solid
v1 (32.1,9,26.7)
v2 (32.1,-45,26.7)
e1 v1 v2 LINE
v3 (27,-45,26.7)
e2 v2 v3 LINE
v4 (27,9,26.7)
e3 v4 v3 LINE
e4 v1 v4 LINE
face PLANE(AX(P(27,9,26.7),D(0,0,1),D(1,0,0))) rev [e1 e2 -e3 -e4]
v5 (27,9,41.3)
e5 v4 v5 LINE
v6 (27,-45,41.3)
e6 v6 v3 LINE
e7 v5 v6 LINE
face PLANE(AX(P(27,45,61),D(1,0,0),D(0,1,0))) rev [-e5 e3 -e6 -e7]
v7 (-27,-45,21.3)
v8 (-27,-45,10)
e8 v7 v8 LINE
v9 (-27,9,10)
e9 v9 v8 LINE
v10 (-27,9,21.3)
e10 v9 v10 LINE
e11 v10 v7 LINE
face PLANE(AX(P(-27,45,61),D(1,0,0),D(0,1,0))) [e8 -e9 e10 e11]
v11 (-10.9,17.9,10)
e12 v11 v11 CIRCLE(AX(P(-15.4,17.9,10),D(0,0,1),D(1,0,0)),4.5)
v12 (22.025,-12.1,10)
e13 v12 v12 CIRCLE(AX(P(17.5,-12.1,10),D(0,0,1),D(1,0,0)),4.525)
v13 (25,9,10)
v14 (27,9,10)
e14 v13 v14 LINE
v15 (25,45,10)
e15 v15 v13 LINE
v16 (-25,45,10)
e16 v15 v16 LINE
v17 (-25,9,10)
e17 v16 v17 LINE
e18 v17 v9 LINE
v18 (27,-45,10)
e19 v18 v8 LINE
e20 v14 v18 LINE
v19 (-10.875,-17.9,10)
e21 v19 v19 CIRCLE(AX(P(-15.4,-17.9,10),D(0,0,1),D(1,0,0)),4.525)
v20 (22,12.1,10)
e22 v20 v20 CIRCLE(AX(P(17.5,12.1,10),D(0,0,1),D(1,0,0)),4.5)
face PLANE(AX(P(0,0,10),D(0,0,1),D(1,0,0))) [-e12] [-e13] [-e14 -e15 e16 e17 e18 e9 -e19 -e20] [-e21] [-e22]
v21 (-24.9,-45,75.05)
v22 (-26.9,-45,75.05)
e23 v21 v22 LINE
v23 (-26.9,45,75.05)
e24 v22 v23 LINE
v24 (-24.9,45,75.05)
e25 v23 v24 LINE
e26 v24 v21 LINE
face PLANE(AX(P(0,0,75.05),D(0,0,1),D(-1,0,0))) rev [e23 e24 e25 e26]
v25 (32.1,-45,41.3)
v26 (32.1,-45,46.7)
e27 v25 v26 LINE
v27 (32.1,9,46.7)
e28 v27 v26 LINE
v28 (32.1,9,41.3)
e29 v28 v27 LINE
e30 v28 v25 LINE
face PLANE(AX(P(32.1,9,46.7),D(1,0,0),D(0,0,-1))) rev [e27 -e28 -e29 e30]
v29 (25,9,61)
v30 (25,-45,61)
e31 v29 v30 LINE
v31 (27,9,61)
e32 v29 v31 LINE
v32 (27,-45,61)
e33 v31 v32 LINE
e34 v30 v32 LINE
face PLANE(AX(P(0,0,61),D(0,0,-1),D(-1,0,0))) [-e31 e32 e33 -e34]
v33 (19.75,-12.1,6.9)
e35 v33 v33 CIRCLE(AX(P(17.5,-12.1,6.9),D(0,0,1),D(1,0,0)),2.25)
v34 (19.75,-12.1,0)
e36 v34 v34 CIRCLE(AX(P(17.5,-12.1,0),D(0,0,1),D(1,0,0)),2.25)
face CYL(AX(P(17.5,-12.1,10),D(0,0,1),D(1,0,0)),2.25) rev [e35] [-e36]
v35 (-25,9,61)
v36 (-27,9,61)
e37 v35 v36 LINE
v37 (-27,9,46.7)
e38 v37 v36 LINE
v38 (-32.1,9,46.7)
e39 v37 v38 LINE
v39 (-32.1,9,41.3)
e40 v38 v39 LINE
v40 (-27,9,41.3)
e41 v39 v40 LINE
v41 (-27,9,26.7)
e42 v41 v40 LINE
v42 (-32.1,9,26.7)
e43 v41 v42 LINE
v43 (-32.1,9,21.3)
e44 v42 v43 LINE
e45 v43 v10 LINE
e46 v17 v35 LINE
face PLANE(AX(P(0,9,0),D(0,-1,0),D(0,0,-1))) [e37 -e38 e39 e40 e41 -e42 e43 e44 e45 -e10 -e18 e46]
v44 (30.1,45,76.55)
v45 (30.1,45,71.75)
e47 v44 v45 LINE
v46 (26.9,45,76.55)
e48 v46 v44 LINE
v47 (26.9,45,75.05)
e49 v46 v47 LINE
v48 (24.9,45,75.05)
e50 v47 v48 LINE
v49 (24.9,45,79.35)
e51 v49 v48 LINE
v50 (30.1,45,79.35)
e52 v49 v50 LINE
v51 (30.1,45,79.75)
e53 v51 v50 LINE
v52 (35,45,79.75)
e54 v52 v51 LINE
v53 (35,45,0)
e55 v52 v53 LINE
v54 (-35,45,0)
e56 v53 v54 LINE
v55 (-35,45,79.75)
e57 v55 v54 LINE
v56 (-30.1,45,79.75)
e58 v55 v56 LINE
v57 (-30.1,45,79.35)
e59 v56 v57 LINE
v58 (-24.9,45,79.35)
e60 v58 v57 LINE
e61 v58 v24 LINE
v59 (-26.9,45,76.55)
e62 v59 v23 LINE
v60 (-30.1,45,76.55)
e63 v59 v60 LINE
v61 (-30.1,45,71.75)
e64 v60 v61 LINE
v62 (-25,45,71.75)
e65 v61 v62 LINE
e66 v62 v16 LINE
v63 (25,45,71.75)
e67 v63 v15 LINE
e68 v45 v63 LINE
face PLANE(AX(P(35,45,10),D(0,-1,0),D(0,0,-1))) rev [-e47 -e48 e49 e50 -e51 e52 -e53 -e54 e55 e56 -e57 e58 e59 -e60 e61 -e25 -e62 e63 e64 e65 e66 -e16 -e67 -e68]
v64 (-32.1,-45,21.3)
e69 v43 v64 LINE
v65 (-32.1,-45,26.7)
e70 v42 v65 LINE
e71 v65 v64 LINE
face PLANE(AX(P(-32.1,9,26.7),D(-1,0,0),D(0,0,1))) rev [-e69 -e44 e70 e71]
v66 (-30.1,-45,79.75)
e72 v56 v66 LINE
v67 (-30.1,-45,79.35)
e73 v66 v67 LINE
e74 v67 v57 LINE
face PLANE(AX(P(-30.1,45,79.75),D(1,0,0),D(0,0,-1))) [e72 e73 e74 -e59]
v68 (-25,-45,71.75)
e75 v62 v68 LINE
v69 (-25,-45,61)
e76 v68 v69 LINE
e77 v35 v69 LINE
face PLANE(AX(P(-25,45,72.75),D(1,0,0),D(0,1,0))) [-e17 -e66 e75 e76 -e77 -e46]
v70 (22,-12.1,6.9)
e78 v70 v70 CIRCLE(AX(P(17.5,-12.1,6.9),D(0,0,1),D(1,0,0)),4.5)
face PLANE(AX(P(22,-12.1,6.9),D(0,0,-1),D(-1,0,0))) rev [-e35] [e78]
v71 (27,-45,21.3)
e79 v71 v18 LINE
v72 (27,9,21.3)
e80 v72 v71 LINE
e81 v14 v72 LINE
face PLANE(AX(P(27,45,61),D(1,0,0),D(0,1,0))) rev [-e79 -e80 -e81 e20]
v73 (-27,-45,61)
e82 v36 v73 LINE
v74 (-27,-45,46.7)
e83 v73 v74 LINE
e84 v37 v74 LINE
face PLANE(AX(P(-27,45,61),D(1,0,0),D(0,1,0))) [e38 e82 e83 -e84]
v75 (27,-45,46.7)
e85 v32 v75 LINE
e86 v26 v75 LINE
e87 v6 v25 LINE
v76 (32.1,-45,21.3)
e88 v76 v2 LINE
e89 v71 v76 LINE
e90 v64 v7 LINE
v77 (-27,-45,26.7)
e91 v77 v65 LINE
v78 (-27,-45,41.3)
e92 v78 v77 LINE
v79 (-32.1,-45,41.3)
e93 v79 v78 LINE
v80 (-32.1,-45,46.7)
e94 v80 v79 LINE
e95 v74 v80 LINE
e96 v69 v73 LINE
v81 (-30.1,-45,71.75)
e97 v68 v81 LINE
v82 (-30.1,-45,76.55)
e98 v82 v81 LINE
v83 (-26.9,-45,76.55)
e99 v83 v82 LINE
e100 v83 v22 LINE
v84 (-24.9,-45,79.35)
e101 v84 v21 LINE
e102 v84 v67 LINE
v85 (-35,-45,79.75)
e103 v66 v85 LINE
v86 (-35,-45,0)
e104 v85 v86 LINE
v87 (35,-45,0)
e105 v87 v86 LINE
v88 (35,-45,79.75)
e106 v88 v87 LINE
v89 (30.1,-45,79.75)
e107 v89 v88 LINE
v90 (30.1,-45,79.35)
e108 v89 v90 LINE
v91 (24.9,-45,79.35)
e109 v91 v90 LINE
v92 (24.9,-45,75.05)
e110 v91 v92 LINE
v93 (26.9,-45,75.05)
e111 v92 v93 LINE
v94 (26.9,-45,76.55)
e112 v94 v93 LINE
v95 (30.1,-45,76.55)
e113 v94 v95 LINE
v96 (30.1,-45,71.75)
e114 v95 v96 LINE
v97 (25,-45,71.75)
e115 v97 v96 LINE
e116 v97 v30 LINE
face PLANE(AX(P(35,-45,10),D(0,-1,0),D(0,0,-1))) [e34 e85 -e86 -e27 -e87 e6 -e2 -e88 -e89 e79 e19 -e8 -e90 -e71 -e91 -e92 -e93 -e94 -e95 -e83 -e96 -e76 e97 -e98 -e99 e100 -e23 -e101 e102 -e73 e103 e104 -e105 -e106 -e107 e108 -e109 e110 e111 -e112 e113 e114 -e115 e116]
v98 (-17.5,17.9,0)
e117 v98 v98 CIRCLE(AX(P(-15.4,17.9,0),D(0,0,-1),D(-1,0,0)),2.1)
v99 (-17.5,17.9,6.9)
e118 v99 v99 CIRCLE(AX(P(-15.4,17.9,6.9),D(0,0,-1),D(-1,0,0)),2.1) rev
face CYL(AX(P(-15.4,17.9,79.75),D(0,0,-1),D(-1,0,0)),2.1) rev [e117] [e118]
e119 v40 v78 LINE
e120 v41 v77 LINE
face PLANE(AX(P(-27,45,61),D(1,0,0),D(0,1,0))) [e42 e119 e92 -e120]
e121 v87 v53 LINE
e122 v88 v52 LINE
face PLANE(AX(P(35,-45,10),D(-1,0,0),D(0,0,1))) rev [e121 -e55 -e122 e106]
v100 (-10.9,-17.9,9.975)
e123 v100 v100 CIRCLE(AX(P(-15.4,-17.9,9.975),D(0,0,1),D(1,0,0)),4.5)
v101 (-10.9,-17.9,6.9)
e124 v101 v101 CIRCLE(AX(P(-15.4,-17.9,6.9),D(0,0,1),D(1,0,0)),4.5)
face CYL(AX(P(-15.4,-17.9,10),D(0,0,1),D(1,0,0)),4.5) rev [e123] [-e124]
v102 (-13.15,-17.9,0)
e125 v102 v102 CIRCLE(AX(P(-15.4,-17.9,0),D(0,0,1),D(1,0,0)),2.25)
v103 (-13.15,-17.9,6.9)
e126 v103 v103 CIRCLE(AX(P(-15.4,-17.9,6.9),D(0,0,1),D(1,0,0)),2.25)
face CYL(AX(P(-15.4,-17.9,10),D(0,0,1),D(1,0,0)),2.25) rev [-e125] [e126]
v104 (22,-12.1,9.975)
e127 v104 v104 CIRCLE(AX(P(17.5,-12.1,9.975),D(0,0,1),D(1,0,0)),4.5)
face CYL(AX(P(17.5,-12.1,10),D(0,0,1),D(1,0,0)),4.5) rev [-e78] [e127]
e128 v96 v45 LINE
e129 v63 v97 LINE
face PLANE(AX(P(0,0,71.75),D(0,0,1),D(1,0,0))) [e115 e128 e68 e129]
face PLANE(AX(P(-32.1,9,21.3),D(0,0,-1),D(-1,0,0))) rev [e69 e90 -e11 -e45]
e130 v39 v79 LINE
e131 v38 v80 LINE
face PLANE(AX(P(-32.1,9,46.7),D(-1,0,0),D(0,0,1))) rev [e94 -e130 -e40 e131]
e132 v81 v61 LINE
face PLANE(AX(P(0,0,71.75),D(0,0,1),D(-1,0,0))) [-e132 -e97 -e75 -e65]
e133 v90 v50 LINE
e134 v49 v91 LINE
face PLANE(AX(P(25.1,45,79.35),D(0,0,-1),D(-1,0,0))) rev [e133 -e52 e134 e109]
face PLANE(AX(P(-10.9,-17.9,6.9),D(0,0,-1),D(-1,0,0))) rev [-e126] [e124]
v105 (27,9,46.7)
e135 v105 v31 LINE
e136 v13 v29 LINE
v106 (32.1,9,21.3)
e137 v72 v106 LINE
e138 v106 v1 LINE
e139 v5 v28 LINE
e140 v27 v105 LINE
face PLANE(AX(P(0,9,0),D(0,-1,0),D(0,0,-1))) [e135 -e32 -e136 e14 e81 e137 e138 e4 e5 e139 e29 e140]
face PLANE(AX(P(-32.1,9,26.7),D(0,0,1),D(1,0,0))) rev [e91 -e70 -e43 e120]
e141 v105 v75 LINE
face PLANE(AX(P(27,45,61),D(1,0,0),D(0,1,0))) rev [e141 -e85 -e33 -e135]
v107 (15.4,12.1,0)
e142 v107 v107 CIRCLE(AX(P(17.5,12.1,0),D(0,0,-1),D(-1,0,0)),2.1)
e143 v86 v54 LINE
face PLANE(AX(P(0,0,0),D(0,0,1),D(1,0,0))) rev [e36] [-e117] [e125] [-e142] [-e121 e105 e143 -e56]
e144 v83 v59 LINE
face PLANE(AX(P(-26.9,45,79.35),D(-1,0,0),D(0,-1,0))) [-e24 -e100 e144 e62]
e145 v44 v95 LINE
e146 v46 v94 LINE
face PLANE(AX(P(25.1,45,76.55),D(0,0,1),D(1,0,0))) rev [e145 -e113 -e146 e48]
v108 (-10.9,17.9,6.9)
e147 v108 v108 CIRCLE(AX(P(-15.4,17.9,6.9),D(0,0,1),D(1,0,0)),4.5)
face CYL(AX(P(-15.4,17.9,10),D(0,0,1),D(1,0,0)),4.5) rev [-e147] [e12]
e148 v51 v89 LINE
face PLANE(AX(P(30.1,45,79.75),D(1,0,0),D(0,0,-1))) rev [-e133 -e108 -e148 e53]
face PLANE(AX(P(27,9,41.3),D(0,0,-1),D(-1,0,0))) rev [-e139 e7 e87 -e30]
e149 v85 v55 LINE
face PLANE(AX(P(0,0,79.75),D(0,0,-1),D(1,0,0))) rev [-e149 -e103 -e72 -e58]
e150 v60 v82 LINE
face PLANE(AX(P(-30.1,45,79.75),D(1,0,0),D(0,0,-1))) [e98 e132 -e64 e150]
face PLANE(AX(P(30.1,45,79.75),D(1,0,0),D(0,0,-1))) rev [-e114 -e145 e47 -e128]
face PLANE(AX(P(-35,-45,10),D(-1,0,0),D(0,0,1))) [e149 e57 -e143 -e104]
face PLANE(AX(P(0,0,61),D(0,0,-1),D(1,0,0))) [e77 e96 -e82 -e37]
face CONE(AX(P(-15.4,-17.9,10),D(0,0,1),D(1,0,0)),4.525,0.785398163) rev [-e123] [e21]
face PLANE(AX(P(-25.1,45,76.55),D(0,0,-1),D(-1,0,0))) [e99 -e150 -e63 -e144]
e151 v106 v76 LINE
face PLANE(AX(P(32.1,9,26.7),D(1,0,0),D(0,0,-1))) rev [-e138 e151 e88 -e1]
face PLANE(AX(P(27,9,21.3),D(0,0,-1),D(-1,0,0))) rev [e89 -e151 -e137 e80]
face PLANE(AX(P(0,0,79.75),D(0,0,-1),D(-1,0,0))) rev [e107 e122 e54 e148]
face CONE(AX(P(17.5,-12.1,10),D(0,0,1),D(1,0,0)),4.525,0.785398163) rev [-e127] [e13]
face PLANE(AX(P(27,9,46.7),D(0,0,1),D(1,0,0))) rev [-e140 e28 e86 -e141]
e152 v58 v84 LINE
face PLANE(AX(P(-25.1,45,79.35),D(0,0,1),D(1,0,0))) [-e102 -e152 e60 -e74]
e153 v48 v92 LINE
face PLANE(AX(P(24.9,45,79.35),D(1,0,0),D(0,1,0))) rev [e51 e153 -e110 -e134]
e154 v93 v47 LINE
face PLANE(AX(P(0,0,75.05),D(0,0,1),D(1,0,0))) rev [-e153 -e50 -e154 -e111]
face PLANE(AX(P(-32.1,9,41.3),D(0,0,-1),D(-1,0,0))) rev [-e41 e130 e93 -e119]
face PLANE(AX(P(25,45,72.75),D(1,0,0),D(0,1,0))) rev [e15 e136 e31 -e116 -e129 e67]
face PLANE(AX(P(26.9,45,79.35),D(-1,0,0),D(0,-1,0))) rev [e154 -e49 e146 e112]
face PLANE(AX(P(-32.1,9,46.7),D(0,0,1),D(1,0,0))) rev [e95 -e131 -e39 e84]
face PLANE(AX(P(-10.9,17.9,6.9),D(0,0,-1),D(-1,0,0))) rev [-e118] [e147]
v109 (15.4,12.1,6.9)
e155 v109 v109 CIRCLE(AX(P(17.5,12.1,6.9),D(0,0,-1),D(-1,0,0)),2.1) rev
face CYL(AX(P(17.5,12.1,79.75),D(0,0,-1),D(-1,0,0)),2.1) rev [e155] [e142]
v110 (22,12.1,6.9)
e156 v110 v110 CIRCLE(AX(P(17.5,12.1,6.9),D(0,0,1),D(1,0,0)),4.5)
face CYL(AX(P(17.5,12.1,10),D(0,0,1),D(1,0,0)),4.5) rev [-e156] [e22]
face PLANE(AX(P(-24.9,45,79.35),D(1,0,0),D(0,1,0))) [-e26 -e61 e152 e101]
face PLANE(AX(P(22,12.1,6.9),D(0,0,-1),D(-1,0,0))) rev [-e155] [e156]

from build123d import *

# Parameters (mm, degrees)
SKETCH1_W                                     = 90
SKETCH1_H                                     = 70
BOSS_EXTRUDE1_DEPTH                           = 10
SKETCH2_W                                     = 8
SKETCH2_H                                     = 90
BOSS_EXTRUDE2_DEPTH                           = 51
SKETCH3_W                                     = 5.1
SKETCH3_H                                     = 5.4
CUT_EXTRUDE1_DEPTH                            = 54
SKETCH14_W                                    = 10
SKETCH14_H                                    = 90
BOSS_EXTRUDE6_DEPTH                           = 11.75
SKETCH15_W                                    = 4.9
SKETCH15_H                                    = 90
BOSS_EXTRUDE7_DEPTH                           = 7
SKETCH17_W                                    = 90
SKETCH17_H                                    = 2.8
BOSS_EXTRUDE8_DEPTH                           = 5
SKETCH16_W                                    = 5.1
SKETCH16_H                                    = 90
CUT_EXTRUDE3_DEPTH                            = 1
BOSS_EXTRUDE9_START                           = -1.5
SKETCH18_W                                    = 2
SKETCH18_H                                    = 90
BOSS_EXTRUDE9_DEPTH                           = 4.3
SKETCH43_W                                    = 36
SKETCH43_H                                    = 51
BOSS_EXTRUDE10_DEPTH                          = 2
SKETCH21_R                                    = 2.1
CUT_EXTRUDE7_DEPTH                            = 99.030926243
CBORE_FOR_M4_PAN_HEAD_MACHINE_SCREW4_AT_COUNT = 2
CBORE_FOR_M4_PAN_HEAD_MACHINE_SCREW4_AT_PITCH = 33.407334524
ADVANCEDHOLE1_START                           = 6.9
ADVANCEDHOLE1_OUTLINE_R                       = 4.5
ADVANCEDHOLE1_OUTLINE_R_2                     = 2.1
ADVANCEDHOLE1_DEPTH                           = 3.1


# Read off the part's stored shape, not the designer's step: AdvancedHole1
with BuildPart() as part:
    # Sketch1 → Boss-Extrude1 (new body)
    with BuildSketch(Plane(origin=(0, 0, 0), x_dir=(0, 1, 0), z_dir=(0, 0, 1))):
        Rectangle(SKETCH1_W, SKETCH1_H)
    extrude(amount=BOSS_EXTRUDE1_DEPTH)

    # Sketch2 → Boss-Extrude2 (add)
    with BuildSketch(Plane.XY.offset(10)):
        with Locations((-31, 0)):
            Rectangle(SKETCH2_W, SKETCH2_H)
        with Locations((31, 0)):
            Rectangle(SKETCH2_W, SKETCH2_H)
    extrude(amount=BOSS_EXTRUDE2_DEPTH)

    # Sketch3 → Cut-Extrude1 (cut)
    with BuildSketch(Plane.XZ.offset(45)):
        with Locations((-29.55, 24)):
            Rectangle(SKETCH3_W, SKETCH3_H)
        with Locations((-29.55, 44)):
            Rectangle(SKETCH3_W, SKETCH3_H)
        with Locations((29.55, 24)):
            Rectangle(SKETCH3_W, SKETCH3_H)
        with Locations((29.55, 44)):
            Rectangle(SKETCH3_W, SKETCH3_H)
    extrude(amount=-CUT_EXTRUDE1_DEPTH, mode=Mode.SUBTRACT)

    # Sketch14 → Boss-Extrude6 (add)
    with BuildSketch(Plane.XY.offset(61)):
        with Locations((30, 0)):
            Rectangle(SKETCH14_W, SKETCH14_H)
    boss_extrude6 = extrude(amount=BOSS_EXTRUDE6_DEPTH)

    # Sketch15 → Boss-Extrude7 (add)
    with BuildSketch(Plane.XY.offset(72.75)):
        with Locations((32.55, 0)):
            Rectangle(SKETCH15_W, SKETCH15_H)
    boss_extrude7 = extrude(amount=BOSS_EXTRUDE7_DEPTH)

    # Sketch17 → Boss-Extrude8 (add)
    with BuildSketch(Plane(origin=(30.1, 0, 0), x_dir=(0, -1, 0), z_dir=(-1, 0, 0))):
        with Locations((0, 77.95)):
            Rectangle(SKETCH17_W, SKETCH17_H)
    boss_extrude8 = extrude(amount=BOSS_EXTRUDE8_DEPTH)

    # Sketch16 → Cut-Extrude3 (cut)
    with BuildSketch(Plane.XY.offset(72.75)):
        with Locations((27.55, 0)):
            Rectangle(SKETCH16_W, SKETCH16_H)
    cut_extrude3 = extrude(amount=-CUT_EXTRUDE3_DEPTH, mode=Mode.SUBTRACT)

    # Sketch18 → Boss-Extrude9 (add)
    with BuildSketch(Plane.XY.offset(76.55).offset(BOSS_EXTRUDE9_START)):
        with Locations((25.9, 0)):
            Rectangle(SKETCH18_W, SKETCH18_H)
    boss_extrude9 = extrude(amount=BOSS_EXTRUDE9_DEPTH)

    # Sketch43 → Boss-Extrude10 (add)
    with BuildSketch(Plane(origin=(27, 0, 0), x_dir=(0, -1, 0), z_dir=(-1, 0, 0))):
        with Locations((-27, 35.5)):
            Rectangle(SKETCH43_W, SKETCH43_H)
    boss_extrude10 = extrude(amount=BOSS_EXTRUDE10_DEPTH)

    # Mirror2: Boss-Extrude6, Boss-Extrude7, Boss-Extrude8, Cut-Extrude3, Boss-Extrude9, Boss-Extrude10 across plane
    add(boss_extrude6.mirror(Plane(origin=(0, 0, 0), x_dir=(0, 0, 1), z_dir=(1, 0, 0))))
    add(boss_extrude7.mirror(Plane(origin=(0, 0, 0), x_dir=(0, 0, 1), z_dir=(1, 0, 0))))
    add(boss_extrude8.mirror(Plane(origin=(0, 0, 0), x_dir=(0, 0, 1), z_dir=(1, 0, 0))))
    add(cut_extrude3.mirror(Plane(origin=(0, 0, 0), x_dir=(0, 0, 1), z_dir=(1, 0, 0))), mode=Mode.SUBTRACT)
    add(boss_extrude9.mirror(Plane(origin=(0, 0, 0), x_dir=(0, 0, 1), z_dir=(1, 0, 0))))
    add(boss_extrude10.mirror(Plane(origin=(0, 0, 0), x_dir=(0, 0, 1), z_dir=(1, 0, 0))))

    # Sketch21 → Cut-Extrude7 (cut, through all)
    with BuildSketch(Plane(origin=(0, 0, 0), x_dir=(1, 0, 0), z_dir=(0, 0, -1))):
        with Locations((17.5, 12.1)):
            Circle(SKETCH21_R)
        with Locations(Location((17.5, -12.1, 0), (0, 0, 180))):
            Circle(SKETCH21_R)
        with Locations(Location((-15.4, -17.9, 0), (0, 0, 180))):
            Circle(SKETCH21_R)
        with Locations((-15.4, 17.9)):
            Circle(SKETCH21_R)
    extrude(amount=-CUT_EXTRUDE7_DEPTH, mode=Mode.SUBTRACT)

    # Sketch30 → CBORE for M4 Pan Head Machine Screw4 (revolve, cut)
    with BuildSketch(Plane(origin=(17.5, -12.1, 10), x_dir=(0, -1, 0), z_dir=(1, 0, 0))):
        Polygon((0, 0), (0, 10), (2.25, 10), (2.25, 3.1), (4.5, 3.1), (4.5, 0.025), (4.525, 0), align=None)
    cbore_for_m4_pan_head_machine_screw4 = revolve(axis=Axis((17.5, -12.1, 16.35), (0, 0, -1)), mode=Mode.SUBTRACT)

    # CBORE for M4 Pan Head Machine Screw4 at: CBORE for M4 Pan Head Machine Screw4 ×2
    with Locations(*[Vector(-0.9848136784555953, -0.1736145694541778, 0) * (i * CBORE_FOR_M4_PAN_HEAD_MACHINE_SCREW4_AT_PITCH) for i in range(1, CBORE_FOR_M4_PAN_HEAD_MACHINE_SCREW4_AT_COUNT)]):
        add(cbore_for_m4_pan_head_machine_screw4, mode=Mode.SUBTRACT)

    # AdvancedHole1 outline → AdvancedHole1 (cut)
    # profile 1 of 2: a face of its own
    with BuildSketch(Plane.XY.offset(ADVANCEDHOLE1_START)):
        with Locations((17.5, 12.1)):
            Circle(ADVANCEDHOLE1_OUTLINE_R)
        with Locations((17.5, 12.1)):
            Circle(ADVANCEDHOLE1_OUTLINE_R_2, mode=Mode.SUBTRACT)
    # profile 2 of 2: a face of its own
    with BuildSketch(Plane.XY.offset(ADVANCEDHOLE1_START)):
        with Locations((-15.4, 17.9)):
            Circle(ADVANCEDHOLE1_OUTLINE_R)
        with Locations((-15.4, 17.9)):
            Circle(ADVANCEDHOLE1_OUTLINE_R_2, mode=Mode.SUBTRACT)
    extrude(amount=ADVANCEDHOLE1_DEPTH, mode=Mode.SUBTRACT)


solid = part.part
